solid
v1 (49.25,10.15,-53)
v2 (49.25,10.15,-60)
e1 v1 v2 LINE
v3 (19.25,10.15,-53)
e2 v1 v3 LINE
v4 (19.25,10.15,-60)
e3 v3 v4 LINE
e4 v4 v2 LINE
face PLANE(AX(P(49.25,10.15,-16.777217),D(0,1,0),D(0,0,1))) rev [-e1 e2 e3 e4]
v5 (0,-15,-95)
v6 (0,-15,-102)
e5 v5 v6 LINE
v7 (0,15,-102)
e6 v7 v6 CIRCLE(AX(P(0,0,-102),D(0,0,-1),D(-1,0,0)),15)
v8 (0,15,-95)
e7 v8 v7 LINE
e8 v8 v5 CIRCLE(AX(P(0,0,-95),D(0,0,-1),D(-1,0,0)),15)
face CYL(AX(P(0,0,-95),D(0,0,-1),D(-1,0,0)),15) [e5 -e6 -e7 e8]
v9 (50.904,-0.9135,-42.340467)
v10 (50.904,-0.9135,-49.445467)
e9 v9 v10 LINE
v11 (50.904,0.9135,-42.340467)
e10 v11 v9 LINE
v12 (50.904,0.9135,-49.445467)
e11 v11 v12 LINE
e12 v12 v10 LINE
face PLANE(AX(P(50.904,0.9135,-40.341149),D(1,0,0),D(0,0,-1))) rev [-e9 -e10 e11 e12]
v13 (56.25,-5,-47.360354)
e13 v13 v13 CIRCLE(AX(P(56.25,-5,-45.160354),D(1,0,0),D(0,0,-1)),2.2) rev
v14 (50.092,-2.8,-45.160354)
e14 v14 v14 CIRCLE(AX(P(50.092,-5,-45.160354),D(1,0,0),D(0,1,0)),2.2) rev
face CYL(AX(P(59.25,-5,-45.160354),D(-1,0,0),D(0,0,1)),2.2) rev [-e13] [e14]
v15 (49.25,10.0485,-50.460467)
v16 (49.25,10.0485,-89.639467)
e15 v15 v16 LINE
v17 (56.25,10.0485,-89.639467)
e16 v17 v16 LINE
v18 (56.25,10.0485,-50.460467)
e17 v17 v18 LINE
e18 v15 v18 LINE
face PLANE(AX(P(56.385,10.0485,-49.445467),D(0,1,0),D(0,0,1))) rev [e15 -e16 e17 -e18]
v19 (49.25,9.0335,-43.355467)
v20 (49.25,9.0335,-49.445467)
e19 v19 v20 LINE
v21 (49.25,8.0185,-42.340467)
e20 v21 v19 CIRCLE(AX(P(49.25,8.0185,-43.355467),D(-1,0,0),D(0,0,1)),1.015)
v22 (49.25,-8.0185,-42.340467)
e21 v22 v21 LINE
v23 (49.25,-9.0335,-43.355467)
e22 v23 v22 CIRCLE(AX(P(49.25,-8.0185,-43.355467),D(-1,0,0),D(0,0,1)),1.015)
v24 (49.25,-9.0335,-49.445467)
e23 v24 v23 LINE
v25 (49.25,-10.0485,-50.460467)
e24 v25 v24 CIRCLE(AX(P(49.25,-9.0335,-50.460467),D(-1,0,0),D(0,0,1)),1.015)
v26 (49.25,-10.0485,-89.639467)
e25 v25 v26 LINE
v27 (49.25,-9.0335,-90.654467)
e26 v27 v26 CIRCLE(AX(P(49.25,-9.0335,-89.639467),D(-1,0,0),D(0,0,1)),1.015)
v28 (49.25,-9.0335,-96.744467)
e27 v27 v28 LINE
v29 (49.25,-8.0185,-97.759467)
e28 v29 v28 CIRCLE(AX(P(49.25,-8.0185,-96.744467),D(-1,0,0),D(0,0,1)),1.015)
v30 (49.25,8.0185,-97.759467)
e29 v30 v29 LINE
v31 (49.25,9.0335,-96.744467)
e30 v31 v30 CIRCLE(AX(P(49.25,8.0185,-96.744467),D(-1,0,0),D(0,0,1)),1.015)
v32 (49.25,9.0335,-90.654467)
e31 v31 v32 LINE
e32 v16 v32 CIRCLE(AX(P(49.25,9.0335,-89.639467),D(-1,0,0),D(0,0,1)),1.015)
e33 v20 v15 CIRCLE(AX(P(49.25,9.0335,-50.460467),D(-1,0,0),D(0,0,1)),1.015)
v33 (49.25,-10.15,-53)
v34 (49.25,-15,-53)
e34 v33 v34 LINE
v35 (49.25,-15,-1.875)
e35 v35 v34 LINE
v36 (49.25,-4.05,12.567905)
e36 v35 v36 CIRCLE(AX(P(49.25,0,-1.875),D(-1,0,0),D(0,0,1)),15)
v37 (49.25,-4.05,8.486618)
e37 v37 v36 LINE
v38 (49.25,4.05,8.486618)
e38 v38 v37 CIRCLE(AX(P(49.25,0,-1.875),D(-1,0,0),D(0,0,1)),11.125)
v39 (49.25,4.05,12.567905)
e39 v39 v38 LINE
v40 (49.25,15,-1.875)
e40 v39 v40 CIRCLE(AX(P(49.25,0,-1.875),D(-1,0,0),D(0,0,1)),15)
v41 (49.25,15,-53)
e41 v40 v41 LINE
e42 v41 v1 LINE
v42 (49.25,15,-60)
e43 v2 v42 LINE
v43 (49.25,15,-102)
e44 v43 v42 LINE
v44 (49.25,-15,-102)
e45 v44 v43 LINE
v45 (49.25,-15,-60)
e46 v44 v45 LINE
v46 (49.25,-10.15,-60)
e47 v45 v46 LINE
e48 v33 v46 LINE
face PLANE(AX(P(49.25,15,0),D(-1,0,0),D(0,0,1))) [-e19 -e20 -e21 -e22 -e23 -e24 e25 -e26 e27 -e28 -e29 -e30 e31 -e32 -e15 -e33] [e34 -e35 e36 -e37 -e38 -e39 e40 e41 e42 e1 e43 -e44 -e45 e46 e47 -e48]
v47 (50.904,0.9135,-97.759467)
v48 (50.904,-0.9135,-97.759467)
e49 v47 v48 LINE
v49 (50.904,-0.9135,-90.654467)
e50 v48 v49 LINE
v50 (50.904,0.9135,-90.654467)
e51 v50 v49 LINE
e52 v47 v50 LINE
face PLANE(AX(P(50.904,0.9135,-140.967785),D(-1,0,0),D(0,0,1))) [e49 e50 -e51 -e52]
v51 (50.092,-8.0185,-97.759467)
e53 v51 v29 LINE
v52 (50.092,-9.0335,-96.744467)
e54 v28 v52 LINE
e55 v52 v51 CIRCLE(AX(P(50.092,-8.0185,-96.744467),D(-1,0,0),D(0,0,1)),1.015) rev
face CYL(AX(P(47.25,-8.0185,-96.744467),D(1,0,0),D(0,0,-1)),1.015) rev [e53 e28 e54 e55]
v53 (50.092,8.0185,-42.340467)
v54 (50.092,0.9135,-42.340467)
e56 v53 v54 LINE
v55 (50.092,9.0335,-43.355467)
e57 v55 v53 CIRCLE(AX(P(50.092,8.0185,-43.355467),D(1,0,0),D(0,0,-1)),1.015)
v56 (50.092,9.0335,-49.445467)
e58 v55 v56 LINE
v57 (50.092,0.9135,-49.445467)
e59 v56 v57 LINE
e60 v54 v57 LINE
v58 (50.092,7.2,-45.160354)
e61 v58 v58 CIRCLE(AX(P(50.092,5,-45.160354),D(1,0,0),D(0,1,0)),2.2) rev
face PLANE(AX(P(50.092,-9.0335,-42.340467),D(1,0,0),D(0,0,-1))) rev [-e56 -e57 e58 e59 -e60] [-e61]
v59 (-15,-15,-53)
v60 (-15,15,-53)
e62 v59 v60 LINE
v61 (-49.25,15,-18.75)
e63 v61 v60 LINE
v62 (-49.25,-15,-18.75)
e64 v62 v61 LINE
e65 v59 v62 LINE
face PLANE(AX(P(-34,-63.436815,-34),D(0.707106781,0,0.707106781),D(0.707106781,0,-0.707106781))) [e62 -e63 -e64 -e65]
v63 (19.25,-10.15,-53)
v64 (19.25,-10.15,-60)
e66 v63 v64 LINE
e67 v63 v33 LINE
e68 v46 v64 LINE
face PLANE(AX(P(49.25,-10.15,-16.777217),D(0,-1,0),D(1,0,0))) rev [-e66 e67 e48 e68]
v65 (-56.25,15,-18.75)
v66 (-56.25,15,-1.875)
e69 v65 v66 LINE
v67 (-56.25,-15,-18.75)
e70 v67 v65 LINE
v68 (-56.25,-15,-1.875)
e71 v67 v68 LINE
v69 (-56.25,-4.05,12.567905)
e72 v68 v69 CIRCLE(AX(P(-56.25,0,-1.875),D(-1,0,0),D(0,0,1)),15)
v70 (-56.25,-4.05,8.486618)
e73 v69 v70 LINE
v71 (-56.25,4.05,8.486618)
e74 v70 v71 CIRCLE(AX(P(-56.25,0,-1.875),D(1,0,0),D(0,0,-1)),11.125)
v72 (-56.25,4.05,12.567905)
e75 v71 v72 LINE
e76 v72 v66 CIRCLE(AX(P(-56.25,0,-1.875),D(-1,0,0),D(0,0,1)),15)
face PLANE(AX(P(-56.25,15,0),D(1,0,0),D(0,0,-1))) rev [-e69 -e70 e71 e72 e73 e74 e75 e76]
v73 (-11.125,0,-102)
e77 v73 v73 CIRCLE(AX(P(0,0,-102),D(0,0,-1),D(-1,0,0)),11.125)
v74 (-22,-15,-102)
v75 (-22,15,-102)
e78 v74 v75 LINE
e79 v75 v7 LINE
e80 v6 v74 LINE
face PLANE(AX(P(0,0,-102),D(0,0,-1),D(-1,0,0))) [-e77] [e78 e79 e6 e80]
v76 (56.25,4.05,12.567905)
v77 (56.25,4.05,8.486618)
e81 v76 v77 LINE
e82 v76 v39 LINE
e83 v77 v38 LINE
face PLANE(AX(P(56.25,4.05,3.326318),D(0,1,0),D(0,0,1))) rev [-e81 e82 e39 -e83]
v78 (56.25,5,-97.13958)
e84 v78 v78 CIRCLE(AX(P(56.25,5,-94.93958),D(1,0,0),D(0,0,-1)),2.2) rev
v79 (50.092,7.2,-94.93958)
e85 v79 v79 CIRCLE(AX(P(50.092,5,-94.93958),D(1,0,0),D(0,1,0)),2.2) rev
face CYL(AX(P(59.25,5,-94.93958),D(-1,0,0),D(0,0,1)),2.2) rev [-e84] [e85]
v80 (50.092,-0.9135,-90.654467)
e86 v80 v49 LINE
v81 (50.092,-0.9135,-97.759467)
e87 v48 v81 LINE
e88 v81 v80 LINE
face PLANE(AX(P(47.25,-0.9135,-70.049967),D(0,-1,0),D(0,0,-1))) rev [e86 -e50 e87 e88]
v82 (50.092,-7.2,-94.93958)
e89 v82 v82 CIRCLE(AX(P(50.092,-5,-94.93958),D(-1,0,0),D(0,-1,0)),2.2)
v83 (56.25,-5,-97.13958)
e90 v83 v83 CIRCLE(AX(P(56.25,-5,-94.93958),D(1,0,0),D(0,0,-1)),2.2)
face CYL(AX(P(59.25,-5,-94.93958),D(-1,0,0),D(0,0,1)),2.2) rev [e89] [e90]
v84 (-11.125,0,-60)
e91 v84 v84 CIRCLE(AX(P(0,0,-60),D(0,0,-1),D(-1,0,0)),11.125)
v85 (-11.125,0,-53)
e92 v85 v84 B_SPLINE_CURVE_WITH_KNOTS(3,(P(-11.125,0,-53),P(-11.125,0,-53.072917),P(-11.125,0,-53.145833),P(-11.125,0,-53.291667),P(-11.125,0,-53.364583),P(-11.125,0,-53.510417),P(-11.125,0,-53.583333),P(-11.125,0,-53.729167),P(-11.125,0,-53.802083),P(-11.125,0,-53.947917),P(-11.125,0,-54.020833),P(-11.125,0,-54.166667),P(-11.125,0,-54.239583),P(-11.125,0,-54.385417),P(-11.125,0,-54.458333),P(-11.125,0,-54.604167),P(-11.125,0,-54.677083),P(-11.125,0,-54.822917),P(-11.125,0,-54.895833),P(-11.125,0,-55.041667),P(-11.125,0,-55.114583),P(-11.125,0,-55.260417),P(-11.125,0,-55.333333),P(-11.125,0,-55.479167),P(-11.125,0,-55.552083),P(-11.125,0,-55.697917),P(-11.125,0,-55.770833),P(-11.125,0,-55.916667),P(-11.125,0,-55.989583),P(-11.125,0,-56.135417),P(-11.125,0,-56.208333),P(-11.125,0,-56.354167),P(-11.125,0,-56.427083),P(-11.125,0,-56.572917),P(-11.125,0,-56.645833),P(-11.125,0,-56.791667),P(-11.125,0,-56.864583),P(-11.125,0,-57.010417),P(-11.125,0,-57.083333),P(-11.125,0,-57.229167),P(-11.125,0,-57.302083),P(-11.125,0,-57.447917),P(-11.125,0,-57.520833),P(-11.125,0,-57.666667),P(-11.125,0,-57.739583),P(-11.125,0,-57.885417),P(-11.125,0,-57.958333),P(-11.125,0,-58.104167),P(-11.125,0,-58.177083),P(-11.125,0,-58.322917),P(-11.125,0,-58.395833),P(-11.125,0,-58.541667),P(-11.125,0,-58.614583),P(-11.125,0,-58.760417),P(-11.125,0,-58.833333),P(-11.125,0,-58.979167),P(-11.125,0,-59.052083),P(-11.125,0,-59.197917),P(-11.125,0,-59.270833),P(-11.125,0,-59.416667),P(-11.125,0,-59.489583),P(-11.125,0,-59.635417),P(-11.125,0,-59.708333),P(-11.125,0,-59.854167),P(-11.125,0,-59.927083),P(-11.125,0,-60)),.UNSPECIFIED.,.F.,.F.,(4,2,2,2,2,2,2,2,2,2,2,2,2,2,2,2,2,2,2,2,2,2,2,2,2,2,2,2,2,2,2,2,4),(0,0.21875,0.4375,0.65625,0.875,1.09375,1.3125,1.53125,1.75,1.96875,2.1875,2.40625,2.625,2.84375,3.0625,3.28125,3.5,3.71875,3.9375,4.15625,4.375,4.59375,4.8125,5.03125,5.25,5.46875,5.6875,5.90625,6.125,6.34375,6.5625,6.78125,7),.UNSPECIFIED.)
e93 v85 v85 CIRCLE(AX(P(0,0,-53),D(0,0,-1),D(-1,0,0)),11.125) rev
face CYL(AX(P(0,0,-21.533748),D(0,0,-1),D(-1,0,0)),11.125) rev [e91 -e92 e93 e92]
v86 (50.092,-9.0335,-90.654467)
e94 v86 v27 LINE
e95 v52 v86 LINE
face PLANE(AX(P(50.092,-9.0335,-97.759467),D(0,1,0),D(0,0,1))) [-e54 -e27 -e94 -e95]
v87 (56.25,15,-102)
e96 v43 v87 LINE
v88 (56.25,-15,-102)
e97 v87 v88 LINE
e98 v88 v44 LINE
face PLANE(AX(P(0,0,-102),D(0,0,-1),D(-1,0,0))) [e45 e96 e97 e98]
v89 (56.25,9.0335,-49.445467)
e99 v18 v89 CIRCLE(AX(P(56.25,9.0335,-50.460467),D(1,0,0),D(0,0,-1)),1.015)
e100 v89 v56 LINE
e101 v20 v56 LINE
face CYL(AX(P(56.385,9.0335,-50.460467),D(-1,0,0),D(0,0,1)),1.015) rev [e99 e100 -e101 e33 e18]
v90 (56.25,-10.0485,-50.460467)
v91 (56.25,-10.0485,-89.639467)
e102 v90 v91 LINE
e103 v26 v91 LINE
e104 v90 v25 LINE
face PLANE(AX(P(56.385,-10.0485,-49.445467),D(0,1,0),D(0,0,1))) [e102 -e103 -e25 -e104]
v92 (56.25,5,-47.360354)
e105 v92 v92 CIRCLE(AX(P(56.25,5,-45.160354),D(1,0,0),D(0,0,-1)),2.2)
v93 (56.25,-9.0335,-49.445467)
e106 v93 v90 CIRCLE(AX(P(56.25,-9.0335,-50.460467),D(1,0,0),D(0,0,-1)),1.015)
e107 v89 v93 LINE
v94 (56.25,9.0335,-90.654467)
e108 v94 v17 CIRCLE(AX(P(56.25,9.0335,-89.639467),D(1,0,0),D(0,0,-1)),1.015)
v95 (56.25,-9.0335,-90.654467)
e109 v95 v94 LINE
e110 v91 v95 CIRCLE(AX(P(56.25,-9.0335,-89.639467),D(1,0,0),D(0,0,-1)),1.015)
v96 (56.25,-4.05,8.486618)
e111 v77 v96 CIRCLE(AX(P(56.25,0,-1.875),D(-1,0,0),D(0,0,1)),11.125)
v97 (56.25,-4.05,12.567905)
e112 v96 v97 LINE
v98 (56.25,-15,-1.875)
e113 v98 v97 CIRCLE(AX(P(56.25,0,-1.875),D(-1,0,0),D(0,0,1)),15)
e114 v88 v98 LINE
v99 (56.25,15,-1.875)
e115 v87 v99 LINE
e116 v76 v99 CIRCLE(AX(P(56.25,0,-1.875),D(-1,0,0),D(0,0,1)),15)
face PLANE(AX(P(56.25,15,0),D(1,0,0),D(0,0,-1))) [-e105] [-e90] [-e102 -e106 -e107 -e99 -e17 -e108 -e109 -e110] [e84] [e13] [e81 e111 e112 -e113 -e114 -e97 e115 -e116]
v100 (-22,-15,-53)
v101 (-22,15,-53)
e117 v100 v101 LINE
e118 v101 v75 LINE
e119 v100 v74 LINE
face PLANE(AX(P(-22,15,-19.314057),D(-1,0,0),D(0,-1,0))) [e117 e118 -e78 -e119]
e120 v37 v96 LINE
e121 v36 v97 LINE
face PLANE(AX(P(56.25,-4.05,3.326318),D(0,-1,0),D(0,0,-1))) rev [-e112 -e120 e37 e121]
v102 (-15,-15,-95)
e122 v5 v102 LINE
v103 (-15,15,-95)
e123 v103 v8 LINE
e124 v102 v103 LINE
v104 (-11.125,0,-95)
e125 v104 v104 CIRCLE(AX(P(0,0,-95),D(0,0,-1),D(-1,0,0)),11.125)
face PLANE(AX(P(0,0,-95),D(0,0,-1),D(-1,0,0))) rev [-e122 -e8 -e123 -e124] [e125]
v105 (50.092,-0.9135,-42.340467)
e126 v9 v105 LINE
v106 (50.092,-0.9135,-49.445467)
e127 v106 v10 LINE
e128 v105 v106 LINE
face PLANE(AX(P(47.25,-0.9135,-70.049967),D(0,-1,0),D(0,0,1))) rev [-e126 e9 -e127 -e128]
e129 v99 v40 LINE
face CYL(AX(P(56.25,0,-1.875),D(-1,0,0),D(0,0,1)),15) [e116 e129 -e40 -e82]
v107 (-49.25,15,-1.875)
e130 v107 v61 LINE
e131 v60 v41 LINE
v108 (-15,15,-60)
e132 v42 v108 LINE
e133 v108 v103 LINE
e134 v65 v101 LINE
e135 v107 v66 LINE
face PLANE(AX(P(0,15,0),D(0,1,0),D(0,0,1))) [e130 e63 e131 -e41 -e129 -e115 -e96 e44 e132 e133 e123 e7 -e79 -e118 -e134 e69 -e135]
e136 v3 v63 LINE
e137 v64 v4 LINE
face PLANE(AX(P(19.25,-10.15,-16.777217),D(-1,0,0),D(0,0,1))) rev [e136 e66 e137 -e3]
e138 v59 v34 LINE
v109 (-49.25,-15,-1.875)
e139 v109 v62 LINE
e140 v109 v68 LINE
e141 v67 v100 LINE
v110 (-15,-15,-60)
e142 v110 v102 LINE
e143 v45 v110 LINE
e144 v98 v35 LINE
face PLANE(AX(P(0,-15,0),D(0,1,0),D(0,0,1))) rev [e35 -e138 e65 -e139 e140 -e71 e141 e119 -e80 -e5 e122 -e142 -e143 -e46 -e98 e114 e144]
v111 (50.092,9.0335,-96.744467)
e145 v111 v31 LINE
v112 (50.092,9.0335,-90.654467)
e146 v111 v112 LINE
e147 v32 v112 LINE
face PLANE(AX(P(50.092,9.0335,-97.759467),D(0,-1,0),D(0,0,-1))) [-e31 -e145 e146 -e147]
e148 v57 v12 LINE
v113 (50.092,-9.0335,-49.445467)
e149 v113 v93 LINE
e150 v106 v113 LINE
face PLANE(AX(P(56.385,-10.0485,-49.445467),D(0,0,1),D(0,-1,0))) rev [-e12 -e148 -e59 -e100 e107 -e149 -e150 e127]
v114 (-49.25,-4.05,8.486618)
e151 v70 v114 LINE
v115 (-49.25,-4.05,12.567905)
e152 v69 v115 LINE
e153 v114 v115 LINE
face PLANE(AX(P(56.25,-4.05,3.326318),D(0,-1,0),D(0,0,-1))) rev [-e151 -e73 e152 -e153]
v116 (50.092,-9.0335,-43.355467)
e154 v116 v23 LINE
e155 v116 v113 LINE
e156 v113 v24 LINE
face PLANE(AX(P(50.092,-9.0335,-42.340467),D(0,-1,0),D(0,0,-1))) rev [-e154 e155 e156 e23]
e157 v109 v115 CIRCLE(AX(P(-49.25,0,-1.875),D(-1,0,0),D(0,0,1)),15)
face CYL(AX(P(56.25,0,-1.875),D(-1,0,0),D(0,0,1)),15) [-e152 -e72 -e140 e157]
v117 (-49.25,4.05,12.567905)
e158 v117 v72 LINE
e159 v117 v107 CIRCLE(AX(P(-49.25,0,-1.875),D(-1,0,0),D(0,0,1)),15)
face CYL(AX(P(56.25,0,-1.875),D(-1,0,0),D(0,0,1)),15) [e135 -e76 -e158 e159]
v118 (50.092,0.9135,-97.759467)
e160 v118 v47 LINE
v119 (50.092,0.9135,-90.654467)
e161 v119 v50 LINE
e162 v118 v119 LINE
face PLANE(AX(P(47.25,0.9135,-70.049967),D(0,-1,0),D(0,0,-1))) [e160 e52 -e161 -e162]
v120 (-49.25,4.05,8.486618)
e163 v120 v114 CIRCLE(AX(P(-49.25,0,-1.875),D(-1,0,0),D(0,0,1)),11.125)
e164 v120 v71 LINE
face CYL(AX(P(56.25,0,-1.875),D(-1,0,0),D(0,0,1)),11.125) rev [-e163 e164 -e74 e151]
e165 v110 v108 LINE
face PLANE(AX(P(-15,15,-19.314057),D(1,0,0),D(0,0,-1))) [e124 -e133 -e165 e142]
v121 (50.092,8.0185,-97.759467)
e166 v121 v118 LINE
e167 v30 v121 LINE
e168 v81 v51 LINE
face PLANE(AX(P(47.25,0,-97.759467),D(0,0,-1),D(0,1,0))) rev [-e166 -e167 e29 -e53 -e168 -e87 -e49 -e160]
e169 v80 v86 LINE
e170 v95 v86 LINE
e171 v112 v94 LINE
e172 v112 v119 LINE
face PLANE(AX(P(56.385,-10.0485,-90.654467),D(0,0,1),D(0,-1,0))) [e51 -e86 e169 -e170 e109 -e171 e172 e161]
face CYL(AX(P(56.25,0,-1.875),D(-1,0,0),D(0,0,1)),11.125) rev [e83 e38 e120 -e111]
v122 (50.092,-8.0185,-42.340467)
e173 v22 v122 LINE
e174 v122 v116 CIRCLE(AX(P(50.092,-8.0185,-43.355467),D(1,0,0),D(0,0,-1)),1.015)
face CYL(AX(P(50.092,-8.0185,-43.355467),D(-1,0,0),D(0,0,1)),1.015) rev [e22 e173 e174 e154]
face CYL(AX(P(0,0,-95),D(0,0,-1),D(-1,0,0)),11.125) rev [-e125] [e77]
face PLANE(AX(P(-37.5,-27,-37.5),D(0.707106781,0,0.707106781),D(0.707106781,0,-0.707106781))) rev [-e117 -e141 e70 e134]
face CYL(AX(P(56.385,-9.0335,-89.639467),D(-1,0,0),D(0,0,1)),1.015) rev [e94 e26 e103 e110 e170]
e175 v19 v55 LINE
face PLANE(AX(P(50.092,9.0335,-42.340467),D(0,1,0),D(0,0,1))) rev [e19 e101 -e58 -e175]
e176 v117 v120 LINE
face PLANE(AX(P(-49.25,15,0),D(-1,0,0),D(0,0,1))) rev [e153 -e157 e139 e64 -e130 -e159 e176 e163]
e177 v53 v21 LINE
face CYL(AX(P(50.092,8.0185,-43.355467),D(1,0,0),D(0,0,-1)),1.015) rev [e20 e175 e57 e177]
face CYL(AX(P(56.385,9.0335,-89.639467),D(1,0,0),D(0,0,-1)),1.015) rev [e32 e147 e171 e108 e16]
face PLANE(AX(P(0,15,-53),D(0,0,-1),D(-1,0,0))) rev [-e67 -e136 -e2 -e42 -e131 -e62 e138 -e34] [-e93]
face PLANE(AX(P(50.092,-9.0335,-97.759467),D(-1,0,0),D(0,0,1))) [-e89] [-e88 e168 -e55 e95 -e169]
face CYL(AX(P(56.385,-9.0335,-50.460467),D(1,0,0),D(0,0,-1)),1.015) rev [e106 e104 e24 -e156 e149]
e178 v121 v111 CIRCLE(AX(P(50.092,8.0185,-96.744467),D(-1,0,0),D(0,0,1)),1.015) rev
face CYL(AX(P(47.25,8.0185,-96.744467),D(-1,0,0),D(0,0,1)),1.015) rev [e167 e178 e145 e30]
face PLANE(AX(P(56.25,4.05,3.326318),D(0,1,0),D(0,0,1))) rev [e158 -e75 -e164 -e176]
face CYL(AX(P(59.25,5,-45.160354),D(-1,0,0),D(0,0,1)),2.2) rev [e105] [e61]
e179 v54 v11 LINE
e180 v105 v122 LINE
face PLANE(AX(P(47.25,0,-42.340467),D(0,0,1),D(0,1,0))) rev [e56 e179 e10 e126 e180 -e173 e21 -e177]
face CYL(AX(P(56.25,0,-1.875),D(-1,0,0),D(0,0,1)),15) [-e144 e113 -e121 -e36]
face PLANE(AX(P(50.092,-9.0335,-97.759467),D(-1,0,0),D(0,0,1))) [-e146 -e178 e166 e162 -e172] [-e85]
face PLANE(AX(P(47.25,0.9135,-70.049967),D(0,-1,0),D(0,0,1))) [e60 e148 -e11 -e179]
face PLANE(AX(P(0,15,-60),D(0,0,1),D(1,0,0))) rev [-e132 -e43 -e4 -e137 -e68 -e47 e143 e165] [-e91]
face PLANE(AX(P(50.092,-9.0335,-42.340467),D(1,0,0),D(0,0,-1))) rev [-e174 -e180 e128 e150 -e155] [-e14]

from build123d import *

# Parameters (mm, degrees)
SKETCH1_W               = 7
SKETCH1_H               = 2
SKETCH1_H_2             = 22.25
BOSS_EXTRUDE1_DEPTH     = 15
CUT_EXTRUDE1_DEPTH      = 129.379320765
CUT_EXTRUDE1_DEPTH_BACK = 129.379320765
SKETCH2_R               = 11.125
SKETCH3_R               = 11.125
CUT_EXTRUDE2_DEPTH      = 7
SKETCH6_W               = 30
SKETCH6_H               = 20.3
CUT_EXTRUDE3_DEPTH      = 7
SKETCH7_R               = 2.2
CUT_EXTRUDE4_DEPTH      = 10
CAVITY3_START           = 49.25
CAVITY3_DEPTH           = 0.842
CAVITY3_2_DEPTH         = 6.6275
CAVITY3_START_2         = 55.8775
CAVITY3_3_DEPTH         = 0.3725
CAVITY3_START_3         = -0.9135
CAVITY3_4_DEPTH         = 1.827
CUT_EXTRUDE5_DEPTH      = 10
CUT_EXTRUDE6_DEPTH      = 0.842
CUT_EXTRUDE7_START      = -7.105
SKETCH10_W              = 0.812
SKETCH10_H              = 1.827
CUT_EXTRUDE7_DEPTH      = 7.105
SKETCH11_W              = 7
SKETCH11_H              = 30
BOSS_EXTRUDE2_DEPTH     = 42
CAVITY4_START           = 49.25
CAVITY4_DEPTH           = 7
CAVITY4_2_DEPTH         = 6.6275
CAVITY4_3_DEPTH         = 0.842
CAVITY4_START_2         = -0.9135
CAVITY4_4_DEPTH         = 1.827
CUT_EXTRUDE8_DEPTH      = 42
MIRROR3_COPY_1_SKETCH_R = 2.2
MIRROR3_COPY_1_DEPTH    = 10
MIRROR3_COPY_2_SKETCH_R = 2.2
MIRROR3_COPY_2_DEPTH    = 10
MIRROR3_COPY_3_DEPTH    = 0.842
CUT_EXTRUDE9_DEPTH      = 42
BOSS_EXTRUDE3_DEPTH     = 30
SKETCH15_R              = 11.125
BOSS_EXTRUDE4_DEPTH     = 7
BOSS_EXTRUDE5_REACH     = 131.007
SKETCH16_W              = 7
SKETCH16_H              = 30
SKETCH17_W              = 9.798681855
SKETCH17_H              = 8.1
CUT_EXTRUDE10_DEPTH     = 153.595052344


with BuildPart() as part:
    # Sketch1 → Boss-Extrude1 (new, symmetric)
    with BuildSketch(Plane(origin=(0, 0, 0), x_dir=(1, 0, 0), z_dir=(0, 1, 0))):
        with Locations((-52.75, -12.125)):
            Rectangle(SKETCH1_W, SKETCH1_H)
        with Locations((-52.75, 0)):
            Rectangle(SKETCH1_W, SKETCH1_H_2)
        Polygon((-49.25, 11.125), (-49.25, 53), (49.25, 53), (49.25, 11.125), (56.25, 11.125), (56.25, 60), (-56.25, 60), (-56.25, 11.125), align=None)
        with Locations((52.75, 0)):
            Rectangle(SKETCH1_W, SKETCH1_H_2)
        with Locations((52.75, -12.125)):
            Rectangle(SKETCH1_W, SKETCH1_H)
    extrude(amount=BOSS_EXTRUDE1_DEPTH, both=True)

    # Sketch2 → Cut-Extrude1 (cut, two sides: drawn at the far end of the back side and taken through both)
    with BuildSketch(Plane.ZY.offset(56.25).offset(-CUT_EXTRUDE1_DEPTH_BACK)):
        with Locations((-1.875, 0)):
            Circle(SKETCH2_R)
        with BuildLine():
            Line((13.125, 15), (-1.875, 15))
            ThreePointArc((-1.875, 15), (8.731601718, 10.606601718), (13.125, 0))
            Line((13.125, 0), (13.125, 15))
        make_face()
        with BuildLine():
            Line((13.125, -15), (13.125, 0))
            ThreePointArc((13.125, 0), (8.731601718, -10.606601718), (-1.875, -15))
            Line((-1.875, -15), (13.125, -15))
        make_face()
    extrude(amount=CUT_EXTRUDE1_DEPTH + CUT_EXTRUDE1_DEPTH_BACK, mode=Mode.SUBTRACT)

    # Sketch3 → Cut-Extrude2 (cut)
    with BuildSketch(Plane(origin=(0, 0, -60), x_dir=(-1, 0, 0), z_dir=(0, 0, -1))):
        Circle(SKETCH3_R)
    extrude(amount=-CUT_EXTRUDE2_DEPTH, mode=Mode.SUBTRACT)

    # Sketch6 → Cut-Extrude3 (cut)
    with BuildSketch(Plane(origin=(0, 0, -60), x_dir=(-1, 0, 0), z_dir=(0, 0, -1))):
        with Locations((-34.25, 0)):
            Rectangle(SKETCH6_W, SKETCH6_H)
    extrude(amount=-CUT_EXTRUDE3_DEPTH, mode=Mode.SUBTRACT)

    # Sketch7 → Cut-Extrude4 (cut)
    with BuildSketch(Plane.ZY.offset(-49.25)):
        with Locations((-45.160353728, 5)):
            Circle(SKETCH7_R)
    cut_extrude4 = extrude(amount=-CUT_EXTRUDE4_DEPTH, mode=Mode.SUBTRACT)

    # Cavity3: read off the stored shape, not the designer's step
    # Cavity3 outline → Cavity3 (cut)
    with BuildSketch(Plane.YZ.offset(CAVITY3_START)):
        with BuildLine():
            Line((-3.80625, -42.340467029), (-3.80625, -42.949467029))
            ThreePointArc((-3.80625, -42.949467029), (-5.075, -47.020009529), (-6.34375, -42.949467029))
            Line((-6.34375, -42.949467029), (-6.34375, -42.340467029))
            Line((-6.34375, -42.340467029), (-8.0185, -42.340467029))
            ThreePointArc((-8.0185, -42.340467029), (-8.736213383, -42.637753646), (-9.0335, -43.355467029))
            Line((-9.0335, -43.355467029), (-9.0335, -49.445467029))
            Line((-9.0335, -49.445467029), (9.0335, -49.445467029))
            Line((9.0335, -49.445467029), (9.0335, -43.355467029))
            ThreePointArc((9.0335, -43.355467029), (8.736213383, -42.637753646), (8.0185, -42.340467029))
            Line((8.0185, -42.340467029), (6.34375, -42.340467029))
            Line((6.34375, -42.340467029), (6.34375, -42.949467029))
            ThreePointArc((6.34375, -42.949467029), (7.209542976, -44.131254024), (7.156577631, -45.595293863))
            ThreePointArc((7.156577631, -45.595293863), (4.566705044, -47.317262507), (2.842761328, -44.728704204))
            ThreePointArc((2.842761328, -44.728704204), (3.111418667, -43.723695206), (3.80625, -42.949467029))
            Line((3.80625, -42.949467029), (3.80625, -42.340467029))
            Line((3.80625, -42.340467029), (-3.80625, -42.340467029))
        make_face()
    extrude(amount=CAVITY3_DEPTH, mode=Mode.SUBTRACT)

    # Cavity3 2 outline → Cavity3 2 (cut)
    with BuildSketch(Plane.YZ.offset(CAVITY3_START)):
        with BuildLine():
            ThreePointArc((10.0485, -50.460467029), (9.751213383, -49.742753646), (9.0335, -49.445467029))
            Line((9.0335, -49.445467029), (-9.0335, -49.445467029))
            ThreePointArc((-9.0335, -49.445467029), (-9.751213383, -49.742753646), (-10.0485, -50.460467029))
            Line((-10.0485, -50.460467029), (-10.0485, -60))
            Line((-10.0485, -60), (10.0485, -60))
            Line((10.0485, -60), (10.0485, -50.460467029))
        make_face()
    extrude(amount=CAVITY3_2_DEPTH, mode=Mode.SUBTRACT)

    # Cavity3 3 outline → Cavity3 3 (cut)
    with BuildSketch(Plane.YZ.offset(CAVITY3_START_2)):
        with BuildLine():
            Line((-9.744, -60), (9.744, -60))
            Line((9.744, -60), (9.744, -50.511217029))
            ThreePointArc((9.744, -50.511217029), (9.521035037, -49.972931992), (8.98275, -49.749967029))
            Line((8.98275, -49.749967029), (-8.98275, -49.749967029))
            ThreePointArc((-8.98275, -49.749967029), (-9.521035037, -49.972931992), (-9.744, -50.511217029))
            Line((-9.744, -50.511217029), (-9.744, -60))
        make_face()
    extrude(amount=CAVITY3_3_DEPTH, mode=Mode.SUBTRACT)

    # Cavity3 4 outline → Cavity3 4 (cut)
    with BuildSketch(Plane(origin=(0, 0, 0), x_dir=(1, 0, 0), z_dir=(0, 1, 0)).offset(CAVITY3_START_3)):
        Polygon((50.092, 49.445467029), (50.092, 42.340467029), (50.904, 49.445467029), align=None)
    extrude(amount=CAVITY3_4_DEPTH, mode=Mode.SUBTRACT)

    # Mirror1: Cut-Extrude4 across plane
    add(cut_extrude4.mirror(Plane.ZX), mode=Mode.SUBTRACT)

    # Sketch8 → Cut-Extrude5 (cut)
    with BuildSketch(Plane.ZY.offset(-55.8775)):
        with BuildLine():
            Line((-60, -10.0485), (-50.460467029, -10.0485))
            ThreePointArc((-50.460467029, -10.0485), (-49.742753646, -9.751213383), (-49.445467029, -9.0335))
            Line((-49.445467029, -9.0335), (-49.445467029, 9.0335))
            ThreePointArc((-49.445467029, 9.0335), (-49.742753646, 9.751213383), (-50.460467029, 10.0485))
            Line((-50.460467029, 10.0485), (-60, 10.0485))
            Line((-60, 10.0485), (-60, 9.744))
            Line((-60, 9.744), (-50.511217029, 9.744))
            ThreePointArc((-50.511217029, 9.744), (-49.972931992, 9.521035037), (-49.749967029, 8.98275))
            Line((-49.749967029, 8.98275), (-49.749967029, -8.98275))
            ThreePointArc((-49.749967029, -8.98275), (-49.972931992, -9.521035037), (-50.511217029, -9.744))
            Line((-50.511217029, -9.744), (-60, -9.744))
            Line((-60, -9.744), (-60, -10.0485))
        make_face()
    cut_extrude5 = extrude(amount=-CUT_EXTRUDE5_DEPTH, mode=Mode.SUBTRACT)

    # Sketch9 → Cut-Extrude6 (cut)
    with BuildSketch(Plane.ZY.offset(-49.25)):
        with BuildLine():
            Line((-42.340467029, 6.34375), (-42.340467029, 3.80625))
            Line((-42.340467029, 3.80625), (-42.949467029, 3.80625))
            ThreePointArc((-42.949467029, 3.80625), (-43.723695206, 3.111418667), (-44.728704204, 2.842761328))
            ThreePointArc((-44.728704204, 2.842761328), (-43.003444949, 5.433294956), (-45.595293863, 7.156577631))
            ThreePointArc((-45.595293863, 7.156577631), (-44.131254024, 7.209542976), (-42.949467029, 6.34375))
            Line((-42.949467029, 6.34375), (-42.340467029, 6.34375))
        make_face()
    cut_extrude6 = extrude(amount=-CUT_EXTRUDE6_DEPTH, mode=Mode.SUBTRACT)

    # Mirror2: Cut-Extrude6 across plane
    add(cut_extrude6.mirror(Plane.ZX), mode=Mode.SUBTRACT)

    # Sketch10 → Cut-Extrude7 (cut)
    with BuildSketch(Plane(origin=(0, 0, -49.445467029), x_dir=(-1, 0, 0), z_dir=(0, 0, -1)).offset(CUT_EXTRUDE7_START)):
        with Locations((-50.498, 0)):
            Rectangle(SKETCH10_W, SKETCH10_H)
    cut_extrude7 = extrude(amount=CUT_EXTRUDE7_DEPTH, mode=Mode.SUBTRACT)

    # Sketch11 → Boss-Extrude2 (add)
    with BuildSketch(Plane(origin=(0, 0, -60), x_dir=(-1, 0, 0), z_dir=(0, 0, -1))):
        with Locations((-52.75, 0)):
            Rectangle(SKETCH11_W, SKETCH11_H)
    extrude(amount=BOSS_EXTRUDE2_DEPTH)

    # Cavity4: read off the stored shape, not the designer's step
    # Cavity4 outline → Cavity4 (cut)
    with BuildSketch(Plane.YZ.offset(CAVITY4_START)):
        with BuildLine():
            Line((9.744, -60), (-9.744, -60))
            Line((-9.744, -60), (-9.744, -89.588717029))
            ThreePointArc((-9.744, -89.588717029), (-9.521035037, -90.127002066), (-8.98275, -90.349967029))
            Line((-8.98275, -90.349967029), (8.98275, -90.349967029))
            ThreePointArc((8.98275, -90.349967029), (9.521035037, -90.127002066), (9.744, -89.588717029))
            Line((9.744, -89.588717029), (9.744, -60))
        make_face()
    extrude(amount=CAVITY4_DEPTH, mode=Mode.SUBTRACT)

    # Cavity4 2 outline → Cavity4 2 (cut)
    with BuildSketch(Plane.YZ.offset(CAVITY4_START)):
        with BuildLine():
            Line((-9.0335, -90.654467029), (9.0335, -90.654467029))
            ThreePointArc((9.0335, -90.654467029), (9.751213383, -90.357180412), (10.0485, -89.639467029))
            Line((10.0485, -89.639467029), (10.0485, -60))
            Line((10.0485, -60), (9.744, -60))
            Line((9.744, -60), (9.744, -89.588717029))
            ThreePointArc((9.744, -89.588717029), (9.521035037, -90.127002066), (8.98275, -90.349967029))
            Line((8.98275, -90.349967029), (-8.98275, -90.349967029))
            ThreePointArc((-8.98275, -90.349967029), (-9.521035037, -90.127002066), (-9.744, -89.588717029))
            Line((-9.744, -89.588717029), (-9.744, -60))
            Line((-9.744, -60), (-10.0485, -60))
            Line((-10.0485, -60), (-10.0485, -89.639467029))
            ThreePointArc((-10.0485, -89.639467029), (-9.751213383, -90.357180412), (-9.0335, -90.654467029))
        make_face()
    extrude(amount=CAVITY4_2_DEPTH, mode=Mode.SUBTRACT)

    # Cavity4 3 outline → Cavity4 3 (cut)
    with BuildSketch(Plane.YZ.offset(CAVITY4_START)):
        with BuildLine():
            Line((-9.0335, -90.654467029), (-9.0335, -96.744467029))
            ThreePointArc((-9.0335, -96.744467029), (-8.736213383, -97.462180412), (-8.0185, -97.759467029))
            Line((-8.0185, -97.759467029), (-6.34375, -97.759467029))
            Line((-6.34375, -97.759467029), (-6.34375, -97.150467029))
            ThreePointArc((-6.34375, -97.150467029), (-5.075, -93.07992453), (-3.80625, -97.150467029))
            Line((-3.80625, -97.150467029), (-3.80625, -97.759467029))
            Line((-3.80625, -97.759467029), (3.80625, -97.759467029))
            Line((3.80625, -97.759467029), (3.80625, -97.150467029))
            ThreePointArc((3.80625, -97.150467029), (5.075, -93.07992453), (6.34375, -97.150467029))
            Line((6.34375, -97.150467029), (6.34375, -97.759467029))
            Line((6.34375, -97.759467029), (8.0185, -97.759467029))
            ThreePointArc((8.0185, -97.759467029), (8.736213383, -97.462180412), (9.0335, -96.744467029))
            Line((9.0335, -96.744467029), (9.0335, -90.654467029))
            Line((9.0335, -90.654467029), (-9.0335, -90.654467029))
        make_face()
    extrude(amount=CAVITY4_3_DEPTH, mode=Mode.SUBTRACT)

    # Cavity4 4 outline → Cavity4 4 (cut)
    with BuildSketch(Plane(origin=(0, 0, 0), x_dir=(1, 0, 0), z_dir=(0, 1, 0)).offset(CAVITY4_START_2)):
        Polygon((50.904, 90.654467029), (50.092, 97.759467029), (50.092, 90.654467029), align=None)
    extrude(amount=CAVITY4_4_DEPTH, mode=Mode.SUBTRACT)

    # Sketch12 → Cut-Extrude8 (cut)
    with BuildSketch(Plane.ZY.offset(-55.8775)):
        with BuildLine():
            Line((-60, 10.0485), (-89.639467029, 10.0485))
            ThreePointArc((-89.639467029, 10.0485), (-90.357180412, 9.751213383), (-90.654467029, 9.0335))
            Line((-90.654467029, 9.0335), (-90.654467029, -9.0335))
            ThreePointArc((-90.654467029, -9.0335), (-90.357180412, -9.751213383), (-89.639467029, -10.0485))
            Line((-89.639467029, -10.0485), (-60, -10.0485))
            Line((-60, -10.0485), (-60, -9.744))
            Line((-60, -9.744), (-89.588717029, -9.744))
            ThreePointArc((-89.588717029, -9.744), (-90.127002066, -9.521035037), (-90.349967029, -8.98275))
            Line((-90.349967029, -8.98275), (-90.349967029, 8.98275))
            ThreePointArc((-90.349967029, 8.98275), (-90.127002066, 9.521035037), (-89.588717029, 9.744))
            Line((-89.588717029, 9.744), (-60, 9.744))
            Line((-60, 9.744), (-60, 10.0485))
        make_face()
    extrude(amount=-CUT_EXTRUDE8_DEPTH, mode=Mode.SUBTRACT)

    # Mirror3: Cut-Extrude5, Cut-Extrude6, Cut-Extrude7 across plane
    add(cut_extrude5.mirror(Plane(origin=(0, 0, -70.049967029), x_dir=(1, 0, 0), z_dir=(0, 0, -1))), mode=Mode.SUBTRACT)
    add(cut_extrude6.mirror(Plane(origin=(0, 0, -70.049967029), x_dir=(1, 0, 0), z_dir=(0, 0, -1))), mode=Mode.SUBTRACT)
    add(cut_extrude7.mirror(Plane(origin=(0, 0, -70.049967029), x_dir=(1, 0, 0), z_dir=(0, 0, -1))), mode=Mode.SUBTRACT)

    # Mirror3 copy 1 sketch → Mirror3 copy 1 (cut)
    with BuildSketch(Plane(origin=(49.25, 0, -140.099934058), x_dir=(0, 0, -1), z_dir=(-1, 0, 0))):
        with Locations((-45.160353728, 5)):
            Circle(MIRROR3_COPY_1_SKETCH_R)
    extrude(amount=-MIRROR3_COPY_1_DEPTH, mode=Mode.SUBTRACT)

    # Mirror3 copy 2 sketch → Mirror3 copy 2 (cut)
    with BuildSketch(Plane(origin=(49.25, 0, -140.099934058), x_dir=(0, 0, -1), z_dir=(-1, 0, 0))):
        with Locations((-45.160353728, -5)):
            Circle(MIRROR3_COPY_2_SKETCH_R)
    extrude(amount=-MIRROR3_COPY_2_DEPTH, mode=Mode.SUBTRACT)

    # Mirror3 copy 3 sketch → Mirror3 copy 3 (cut)
    with BuildSketch(Plane(origin=(49.25, 0, -140.099934058), x_dir=(0, 0, -1), z_dir=(-1, 0, 0))):
        with BuildLine():
            Line((-42.340467029, 6.34375), (-42.340467029, 3.80625))
            Line((-42.340467029, 3.80625), (-42.949467029, 3.80625))
            ThreePointArc((-42.949467029, 3.80625), (-43.723695206, 3.111418667), (-44.728704204, 2.842761328))
            ThreePointArc((-44.728704204, 2.842761328), (-43.003444949, 5.433294956), (-45.595293863, 7.156577631))
            ThreePointArc((-45.595293863, 7.156577631), (-44.131254024, 7.209542976), (-42.949467029, 6.34375))
            Line((-42.949467029, 6.34375), (-42.340467029, 6.34375))
        make_face()
    extrude(amount=-MIRROR3_COPY_3_DEPTH, mode=Mode.SUBTRACT)

    # Sketch13 → Cut-Extrude9 (cut)
    with BuildSketch(Plane(origin=(0, 15, 0), x_dir=(1, 0, 0), z_dir=(0, 1, 0))):
        Polygon((-56.25, 60), (-56.25, 18.75), (-15, 60), align=None)
    extrude(amount=-CUT_EXTRUDE9_DEPTH, mode=Mode.SUBTRACT)


with BuildPart() as cut_extrude9_piece_1:
    # of the separate pieces the step leaves, piece 1, a body of its own (cut_extrude9_pieces)
    add(part.part.solids().sort_by_distance((49.25, 15, -60))[0])



with BuildPart() as cut_extrude9_piece_2:
    # of the separate pieces the step leaves, piece 2, a body of its own (cut_extrude9_pieces)
    add(part.part.solids().sort_by_distance((-56.25, 15, -1.875))[0])


with BuildPart() as cut_extrude9_piece_1_1:
    add(cut_extrude9_piece_1.part)

    add(cut_extrude9_piece_2.part)  # Boss-Extrude3 merges Cut-Extrude9 piece 2
    # Sketch13<3> → Boss-Extrude3 (add)
    with BuildSketch(Plane(origin=(0, 15, 0), x_dir=(1, 0, 0), z_dir=(0, 1, 0))):
        Polygon((-49.25, 25.75), (-49.25, 18.75), (-15, 53), (-22, 53), align=None)
    extrude(amount=-BOSS_EXTRUDE3_DEPTH)



with BuildPart() as body_2:
    # Sketch15 → Boss-Extrude4 (new body)
    with BuildSketch(Plane(origin=(0, 0, -102), x_dir=(-1, 0, 0), z_dir=(0, 0, -1))):
        with BuildLine():
            Line((0, 15), (15, 15))
            Line((15, 15), (15, -15))
            Line((15, -15), (0, -15))
            ThreePointArc((0, -15), (-15, 0), (0, 15))
        make_face()
        Circle(SKETCH15_R, mode=Mode.SUBTRACT)
    extrude(amount=-BOSS_EXTRUDE4_DEPTH)


with BuildPart() as cut_extrude9_piece_1_2:
    add(cut_extrude9_piece_1_1.part)

    add(body_2.part)  # Boss-Extrude5 merges body 2
    # Boss-Extrude5: up to this plane
    boss_extrude5_end = Plane(origin=(-37.5, -27, -37.5), z_dir=(0.7071067811865447, 0, 0.7071067811865505))
    # Sketch16 → Boss-Extrude5 (add, up to the surface)
    with BuildSketch(Plane(origin=(0, 0, -102), x_dir=(-1, 0, 0), z_dir=(0, 0, -1)), mode=Mode.PRIVATE) as boss_extrude5_sk1:
        with Locations((18.5, 0)):
            Rectangle(SKETCH16_W, SKETCH16_H)
    boss_extrude5_tool1 = split(extrude(boss_extrude5_sk1.sketch, amount=-BOSS_EXTRUDE5_REACH, mode=Mode.PRIVATE), bisect_by=boss_extrude5_end, keep=Keep.BOTH, mode=Mode.PRIVATE)
    add(boss_extrude5_tool1.solids().sort_by_distance((-18.5, 0, -102))[0])

    # Sketch17 → Cut-Extrude10 (cut, through all)
    with BuildSketch(Plane.ZY.offset(56.25)):
        with Locations((8.225659073, 0)):
            Rectangle(SKETCH17_W, SKETCH17_H)
    extrude(amount=-CUT_EXTRUDE10_DEPTH, mode=Mode.SUBTRACT)


solid = cut_extrude9_piece_1_2.part
